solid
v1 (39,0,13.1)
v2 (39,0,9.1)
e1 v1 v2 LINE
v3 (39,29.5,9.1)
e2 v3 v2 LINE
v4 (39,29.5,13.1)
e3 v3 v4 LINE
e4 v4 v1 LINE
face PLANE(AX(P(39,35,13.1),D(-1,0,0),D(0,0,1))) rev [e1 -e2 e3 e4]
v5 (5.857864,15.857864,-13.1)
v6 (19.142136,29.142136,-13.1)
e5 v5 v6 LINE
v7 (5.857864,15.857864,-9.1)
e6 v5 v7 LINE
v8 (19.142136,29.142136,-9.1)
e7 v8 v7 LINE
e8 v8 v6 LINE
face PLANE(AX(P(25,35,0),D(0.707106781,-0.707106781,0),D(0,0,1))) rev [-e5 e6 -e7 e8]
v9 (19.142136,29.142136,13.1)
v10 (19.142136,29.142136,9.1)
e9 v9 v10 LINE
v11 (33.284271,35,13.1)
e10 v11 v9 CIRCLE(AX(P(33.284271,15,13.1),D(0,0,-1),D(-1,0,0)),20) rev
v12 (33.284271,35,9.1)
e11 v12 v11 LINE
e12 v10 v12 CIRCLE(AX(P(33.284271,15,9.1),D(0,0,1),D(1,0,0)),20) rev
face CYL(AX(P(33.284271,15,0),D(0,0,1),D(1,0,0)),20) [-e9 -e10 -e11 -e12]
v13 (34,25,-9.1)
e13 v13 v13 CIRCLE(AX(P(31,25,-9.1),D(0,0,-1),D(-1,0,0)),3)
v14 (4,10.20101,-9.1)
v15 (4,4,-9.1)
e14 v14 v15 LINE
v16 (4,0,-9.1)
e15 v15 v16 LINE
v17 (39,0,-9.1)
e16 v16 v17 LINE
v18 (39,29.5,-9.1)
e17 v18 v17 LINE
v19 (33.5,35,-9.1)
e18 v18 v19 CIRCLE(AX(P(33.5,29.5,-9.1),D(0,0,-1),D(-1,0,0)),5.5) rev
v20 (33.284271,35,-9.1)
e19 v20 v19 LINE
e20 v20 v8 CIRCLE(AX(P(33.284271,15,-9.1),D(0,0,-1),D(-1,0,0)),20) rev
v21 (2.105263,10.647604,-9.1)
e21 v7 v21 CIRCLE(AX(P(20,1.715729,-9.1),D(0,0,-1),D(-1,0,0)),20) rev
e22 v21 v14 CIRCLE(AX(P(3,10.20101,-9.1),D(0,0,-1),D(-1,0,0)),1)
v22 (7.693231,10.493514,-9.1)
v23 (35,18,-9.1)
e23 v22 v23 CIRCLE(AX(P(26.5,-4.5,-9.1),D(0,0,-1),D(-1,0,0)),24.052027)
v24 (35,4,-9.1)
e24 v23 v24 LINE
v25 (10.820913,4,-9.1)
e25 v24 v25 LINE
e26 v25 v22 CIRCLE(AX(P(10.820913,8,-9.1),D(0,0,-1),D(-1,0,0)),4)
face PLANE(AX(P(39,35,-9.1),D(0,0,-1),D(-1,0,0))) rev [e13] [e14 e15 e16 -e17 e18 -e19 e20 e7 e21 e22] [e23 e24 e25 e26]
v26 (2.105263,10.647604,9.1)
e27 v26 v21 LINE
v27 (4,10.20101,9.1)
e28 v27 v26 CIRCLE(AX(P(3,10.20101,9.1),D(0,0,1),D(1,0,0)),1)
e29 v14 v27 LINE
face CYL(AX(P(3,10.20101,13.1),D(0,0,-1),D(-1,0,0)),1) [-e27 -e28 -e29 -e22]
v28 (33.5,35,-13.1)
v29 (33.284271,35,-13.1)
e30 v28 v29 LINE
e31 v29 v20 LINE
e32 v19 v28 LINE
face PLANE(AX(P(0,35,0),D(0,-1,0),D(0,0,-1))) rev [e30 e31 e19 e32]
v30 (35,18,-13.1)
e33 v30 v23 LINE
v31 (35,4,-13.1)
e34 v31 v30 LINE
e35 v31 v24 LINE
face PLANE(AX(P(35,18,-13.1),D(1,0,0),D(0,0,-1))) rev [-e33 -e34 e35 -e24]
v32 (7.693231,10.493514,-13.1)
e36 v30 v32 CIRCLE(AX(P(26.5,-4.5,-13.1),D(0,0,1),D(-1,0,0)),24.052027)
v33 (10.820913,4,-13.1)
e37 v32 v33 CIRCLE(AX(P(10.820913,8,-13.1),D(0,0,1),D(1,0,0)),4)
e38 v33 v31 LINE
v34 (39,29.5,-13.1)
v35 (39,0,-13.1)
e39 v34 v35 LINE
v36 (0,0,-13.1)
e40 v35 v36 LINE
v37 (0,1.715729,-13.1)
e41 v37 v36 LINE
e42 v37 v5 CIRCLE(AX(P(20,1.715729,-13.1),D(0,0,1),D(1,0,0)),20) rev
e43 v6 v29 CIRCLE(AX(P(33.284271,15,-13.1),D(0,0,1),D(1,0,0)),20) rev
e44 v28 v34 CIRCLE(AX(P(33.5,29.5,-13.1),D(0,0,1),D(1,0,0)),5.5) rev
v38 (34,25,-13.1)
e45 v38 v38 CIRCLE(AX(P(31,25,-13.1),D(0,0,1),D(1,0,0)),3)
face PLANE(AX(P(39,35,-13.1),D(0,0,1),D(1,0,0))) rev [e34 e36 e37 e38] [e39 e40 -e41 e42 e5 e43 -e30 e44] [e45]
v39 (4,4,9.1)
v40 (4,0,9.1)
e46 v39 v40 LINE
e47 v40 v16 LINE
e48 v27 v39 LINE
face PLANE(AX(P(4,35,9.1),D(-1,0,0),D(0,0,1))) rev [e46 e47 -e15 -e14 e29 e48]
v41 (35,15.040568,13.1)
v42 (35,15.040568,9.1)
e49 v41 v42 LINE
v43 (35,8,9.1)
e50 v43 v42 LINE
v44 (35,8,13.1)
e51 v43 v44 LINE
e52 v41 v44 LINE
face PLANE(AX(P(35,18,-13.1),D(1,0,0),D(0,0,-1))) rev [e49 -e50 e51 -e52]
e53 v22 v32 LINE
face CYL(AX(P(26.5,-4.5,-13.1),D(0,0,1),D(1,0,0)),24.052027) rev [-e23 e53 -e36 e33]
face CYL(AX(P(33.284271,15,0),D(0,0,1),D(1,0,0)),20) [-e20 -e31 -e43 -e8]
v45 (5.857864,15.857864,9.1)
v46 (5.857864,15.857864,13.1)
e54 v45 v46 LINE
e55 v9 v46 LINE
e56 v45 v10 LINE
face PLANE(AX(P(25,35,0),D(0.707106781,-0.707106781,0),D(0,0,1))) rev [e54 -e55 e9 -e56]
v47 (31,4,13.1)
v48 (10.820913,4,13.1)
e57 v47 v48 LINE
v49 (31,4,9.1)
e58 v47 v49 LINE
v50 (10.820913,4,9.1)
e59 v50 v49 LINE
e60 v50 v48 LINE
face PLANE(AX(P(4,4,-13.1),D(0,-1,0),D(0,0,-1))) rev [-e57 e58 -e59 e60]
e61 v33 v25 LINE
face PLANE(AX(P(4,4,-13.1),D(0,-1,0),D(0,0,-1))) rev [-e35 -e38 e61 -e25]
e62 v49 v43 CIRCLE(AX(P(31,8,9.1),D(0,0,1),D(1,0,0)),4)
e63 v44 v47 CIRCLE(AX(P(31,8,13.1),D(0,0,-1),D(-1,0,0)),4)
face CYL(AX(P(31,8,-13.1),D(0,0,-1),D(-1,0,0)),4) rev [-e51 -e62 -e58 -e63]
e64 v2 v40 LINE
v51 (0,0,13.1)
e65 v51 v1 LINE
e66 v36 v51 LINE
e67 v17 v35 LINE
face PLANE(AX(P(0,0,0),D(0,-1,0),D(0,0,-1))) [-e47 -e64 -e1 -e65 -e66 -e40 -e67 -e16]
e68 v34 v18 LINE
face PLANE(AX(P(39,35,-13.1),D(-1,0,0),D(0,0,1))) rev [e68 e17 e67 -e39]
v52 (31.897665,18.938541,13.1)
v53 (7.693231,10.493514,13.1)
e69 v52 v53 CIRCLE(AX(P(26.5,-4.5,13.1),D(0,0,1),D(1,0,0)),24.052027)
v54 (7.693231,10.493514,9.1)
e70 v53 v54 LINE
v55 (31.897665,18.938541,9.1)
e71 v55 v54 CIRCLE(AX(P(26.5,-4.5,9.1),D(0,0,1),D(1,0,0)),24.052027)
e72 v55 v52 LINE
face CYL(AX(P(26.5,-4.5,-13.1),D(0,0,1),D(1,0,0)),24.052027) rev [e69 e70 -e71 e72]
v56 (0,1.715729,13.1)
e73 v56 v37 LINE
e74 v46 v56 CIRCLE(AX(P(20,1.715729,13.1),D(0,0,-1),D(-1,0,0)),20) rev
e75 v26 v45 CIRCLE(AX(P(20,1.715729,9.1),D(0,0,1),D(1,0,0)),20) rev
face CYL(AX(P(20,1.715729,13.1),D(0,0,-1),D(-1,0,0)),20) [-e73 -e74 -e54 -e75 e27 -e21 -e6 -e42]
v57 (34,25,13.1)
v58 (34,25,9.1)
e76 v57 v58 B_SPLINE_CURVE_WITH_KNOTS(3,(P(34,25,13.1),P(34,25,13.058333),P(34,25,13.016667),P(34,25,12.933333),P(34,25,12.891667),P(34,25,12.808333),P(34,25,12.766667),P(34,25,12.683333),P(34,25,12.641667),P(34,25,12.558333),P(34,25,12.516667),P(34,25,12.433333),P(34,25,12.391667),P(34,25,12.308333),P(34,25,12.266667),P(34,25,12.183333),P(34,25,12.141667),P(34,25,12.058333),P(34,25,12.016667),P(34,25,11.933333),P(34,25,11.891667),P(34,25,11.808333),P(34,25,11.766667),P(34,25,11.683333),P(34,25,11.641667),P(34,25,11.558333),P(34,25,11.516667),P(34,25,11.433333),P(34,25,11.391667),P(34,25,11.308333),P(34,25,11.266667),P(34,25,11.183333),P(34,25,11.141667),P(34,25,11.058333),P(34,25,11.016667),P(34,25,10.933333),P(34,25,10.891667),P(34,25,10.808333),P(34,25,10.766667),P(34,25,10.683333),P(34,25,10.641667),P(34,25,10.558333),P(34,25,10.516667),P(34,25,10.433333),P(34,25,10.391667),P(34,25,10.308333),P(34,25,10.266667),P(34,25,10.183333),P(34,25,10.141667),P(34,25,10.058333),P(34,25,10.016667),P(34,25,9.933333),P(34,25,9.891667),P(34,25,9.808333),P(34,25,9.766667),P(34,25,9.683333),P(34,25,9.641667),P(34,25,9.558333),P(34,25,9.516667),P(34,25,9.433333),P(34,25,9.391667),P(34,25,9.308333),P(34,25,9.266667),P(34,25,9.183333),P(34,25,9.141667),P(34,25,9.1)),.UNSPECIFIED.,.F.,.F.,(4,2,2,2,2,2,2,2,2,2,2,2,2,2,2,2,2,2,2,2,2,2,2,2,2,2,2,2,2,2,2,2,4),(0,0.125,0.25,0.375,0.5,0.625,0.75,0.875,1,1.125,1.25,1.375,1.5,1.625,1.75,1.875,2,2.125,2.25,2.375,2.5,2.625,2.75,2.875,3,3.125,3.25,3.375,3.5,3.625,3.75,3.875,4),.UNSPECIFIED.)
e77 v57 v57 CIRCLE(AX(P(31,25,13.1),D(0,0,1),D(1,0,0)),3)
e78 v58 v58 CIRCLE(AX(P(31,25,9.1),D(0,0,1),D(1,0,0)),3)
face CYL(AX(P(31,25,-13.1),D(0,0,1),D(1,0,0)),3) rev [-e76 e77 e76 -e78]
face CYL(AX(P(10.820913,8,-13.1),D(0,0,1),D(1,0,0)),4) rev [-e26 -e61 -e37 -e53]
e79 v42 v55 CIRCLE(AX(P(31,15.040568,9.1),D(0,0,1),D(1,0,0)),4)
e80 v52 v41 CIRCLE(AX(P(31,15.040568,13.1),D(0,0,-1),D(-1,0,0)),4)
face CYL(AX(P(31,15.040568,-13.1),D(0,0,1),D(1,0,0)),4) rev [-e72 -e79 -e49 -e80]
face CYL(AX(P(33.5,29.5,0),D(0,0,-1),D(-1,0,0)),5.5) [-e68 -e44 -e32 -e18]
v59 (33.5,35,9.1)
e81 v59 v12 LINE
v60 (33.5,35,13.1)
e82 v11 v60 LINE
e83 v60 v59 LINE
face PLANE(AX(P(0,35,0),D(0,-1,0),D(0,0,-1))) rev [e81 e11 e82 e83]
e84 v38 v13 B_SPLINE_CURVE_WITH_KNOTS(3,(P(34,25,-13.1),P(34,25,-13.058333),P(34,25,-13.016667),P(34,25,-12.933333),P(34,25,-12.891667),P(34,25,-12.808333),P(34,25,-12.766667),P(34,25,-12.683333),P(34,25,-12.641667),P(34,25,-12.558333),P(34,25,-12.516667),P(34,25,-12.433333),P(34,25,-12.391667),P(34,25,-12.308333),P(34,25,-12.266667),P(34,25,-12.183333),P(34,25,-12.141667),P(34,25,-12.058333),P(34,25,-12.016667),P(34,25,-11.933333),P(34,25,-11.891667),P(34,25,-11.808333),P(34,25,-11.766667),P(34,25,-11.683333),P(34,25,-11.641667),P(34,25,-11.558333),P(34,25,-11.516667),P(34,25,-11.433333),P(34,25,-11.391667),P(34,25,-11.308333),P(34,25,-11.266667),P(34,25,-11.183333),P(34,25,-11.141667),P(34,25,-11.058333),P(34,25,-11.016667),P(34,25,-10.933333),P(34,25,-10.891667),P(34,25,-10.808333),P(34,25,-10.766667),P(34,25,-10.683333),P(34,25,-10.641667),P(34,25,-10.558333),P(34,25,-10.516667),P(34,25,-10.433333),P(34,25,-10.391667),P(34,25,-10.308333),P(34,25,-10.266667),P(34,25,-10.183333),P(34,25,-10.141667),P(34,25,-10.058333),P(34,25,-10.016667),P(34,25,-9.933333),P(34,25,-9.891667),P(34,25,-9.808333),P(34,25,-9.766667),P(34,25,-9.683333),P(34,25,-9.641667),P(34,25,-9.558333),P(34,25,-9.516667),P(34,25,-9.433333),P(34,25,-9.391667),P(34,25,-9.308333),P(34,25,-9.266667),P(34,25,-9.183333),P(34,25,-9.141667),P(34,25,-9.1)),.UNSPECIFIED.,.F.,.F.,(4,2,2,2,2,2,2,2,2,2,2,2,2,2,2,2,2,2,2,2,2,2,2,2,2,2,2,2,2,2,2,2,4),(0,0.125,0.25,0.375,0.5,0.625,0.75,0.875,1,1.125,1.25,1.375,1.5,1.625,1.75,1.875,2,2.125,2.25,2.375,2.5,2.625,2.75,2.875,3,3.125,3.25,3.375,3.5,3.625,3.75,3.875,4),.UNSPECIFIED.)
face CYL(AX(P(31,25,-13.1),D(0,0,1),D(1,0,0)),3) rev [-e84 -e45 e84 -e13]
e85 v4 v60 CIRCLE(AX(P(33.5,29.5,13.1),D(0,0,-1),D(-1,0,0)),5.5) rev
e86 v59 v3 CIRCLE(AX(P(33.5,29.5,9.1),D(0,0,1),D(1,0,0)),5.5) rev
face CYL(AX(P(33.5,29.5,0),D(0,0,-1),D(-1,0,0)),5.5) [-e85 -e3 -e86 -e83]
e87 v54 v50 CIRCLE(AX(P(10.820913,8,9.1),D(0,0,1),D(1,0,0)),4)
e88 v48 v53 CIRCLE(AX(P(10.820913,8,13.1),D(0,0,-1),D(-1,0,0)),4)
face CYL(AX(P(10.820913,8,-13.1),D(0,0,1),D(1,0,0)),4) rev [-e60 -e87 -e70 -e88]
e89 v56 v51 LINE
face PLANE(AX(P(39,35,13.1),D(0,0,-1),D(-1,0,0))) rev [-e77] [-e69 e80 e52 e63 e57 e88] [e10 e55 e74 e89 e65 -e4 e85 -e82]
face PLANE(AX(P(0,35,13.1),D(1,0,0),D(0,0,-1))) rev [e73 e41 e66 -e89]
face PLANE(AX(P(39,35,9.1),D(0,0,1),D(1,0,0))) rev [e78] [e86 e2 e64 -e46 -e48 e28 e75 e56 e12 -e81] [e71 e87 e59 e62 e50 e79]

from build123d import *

# Parameters (mm, degrees)
BOSS_EXTRUDE1_DEPTH     = 35
CUT_EXTRUDE1_DEPTH      = 55.01490535
CUT_EXTRUDE1_DEPTH_BACK = 55.01490535
SKETCH4_R               = 3
CHAMFER1_SIZE           = 25
FILLET1_R               = 20
FILLET2_R               = 5.5
FILLET3_R               = 1
CUT_EXTRUDE2_DEPTH      = 59.587029281
CUT_EXTRUDE2_DEPTH_BACK = 59.587029281
FILLET4_R               = 4


with BuildPart() as part:
    # Sketch3 → Boss-Extrude1 (new body)
    with BuildSketch(Plane(origin=(0, 0, 0), x_dir=(1, 0, 0), z_dir=(0, 1, 0))):
        Polygon((39, -13.1), (39, -9.1), (4, -9.1), (4, 9.1), (39, 9.1), (39, 13.1), (0, 13.1), (0, -13.1), align=None)
    extrude(amount=BOSS_EXTRUDE1_DEPTH)

    # Sketch4 → Cut-Extrude1 (cut, two sides: drawn at the far end of the back side and taken through both)
    with BuildSketch(Plane.XY.offset(-CUT_EXTRUDE1_DEPTH_BACK)):
        with Locations((31, 25)):
            Circle(SKETCH4_R)
    extrude(amount=CUT_EXTRUDE1_DEPTH + CUT_EXTRUDE1_DEPTH_BACK, mode=Mode.SUBTRACT)

    # Chamfer1
    # the kernel refuses this chamfer: 25 mm, written as the material it takes off along each edge
    with BuildSketch(Plane(origin=(0, 35, -77.392074699), x_dir=(0.9996219169112966, 0.027495876610586317, 0), z_dir=(0, 0, 1))) as chamfer1_piece_1:
        Polygon((CHAMFER1_SIZE * 0.999621916911, -CHAMFER1_SIZE * 0.0274958766106), (-CHAMFER1_SIZE * 0.0274958766106, -CHAMFER1_SIZE * 0.999621916911), (0, 0), align=None)
    extrude(amount=154.784149398, mode=Mode.SUBTRACT)

    # Fillet1
    # the kernel refuses this fillet: 20 mm, written as the material it takes off along each edge
    with BuildSketch(Plane(origin=(0, 10, -33.810678119), x_dir=(0.7071067811862652, 0.7071067811868299, 0), z_dir=(0, 0, 1))) as fillet1_piece_1:
        with BuildLine():
            CenterArc((FILLET1_R * 0.414213562373, -FILLET1_R), FILLET1_R, 90, 45)
            Line((-FILLET1_R * 0.292893218813, -FILLET1_R * 0.292893218813), (0, 0))
            Line((0, 0), (FILLET1_R * 0.414213562373, 0))
        make_face()
    extrude(amount=67.621356237, mode=Mode.SUBTRACT)
    with BuildSketch(Plane(origin=(25, 35, -33.810678119), x_dir=(-0.7071067811862648, -0.7071067811868303, 0), z_dir=(0, 0, 1))) as fillet1_piece_2:
        with BuildLine():
            CenterArc((FILLET1_R * 0.414213562373, FILLET1_R), FILLET1_R, 225, 45)
            Line((-FILLET1_R * 0.292893218814, FILLET1_R * 0.292893218814), (0, 0))
            Line((0, 0), (FILLET1_R * 0.414213562373, 0))
        make_face()
    extrude(amount=45.421356237, mode=Mode.SUBTRACT)
    with BuildSketch(Plane(origin=(25, 35, -11.610678119), x_dir=(1, 0, 0), z_dir=(0, 0, 1))) as fillet1_piece_3:
        with BuildLine():
            CenterArc((FILLET1_R * 0.414213562373, -FILLET1_R), FILLET1_R, 90, 45)
            Line((-FILLET1_R * 0.292893218814, -FILLET1_R * 0.292893218814), (0, 0))
            Line((0, 0), (FILLET1_R * 0.414213562373, 0))
        make_face()
    extrude(amount=45.421356237, mode=Mode.SUBTRACT)

    # Fillet2
    fillet2_edges = [part.edges().sort_by_distance(p)[0] for p in [
        (39, 35, -11.1),
        (39, 35, 11.1),
    ]]
    fillet(fillet2_edges, radius=FILLET2_R)

    # Fillet3
    fillet3_edges = [part.edges().sort_by_distance(p)[0] for p in [
        (4, 13.715728753, 0),
    ]]
    fillet(fillet3_edges, radius=FILLET3_R)

    # Sketch5 → Cut-Extrude2 (cut, two sides: drawn at the far end of the back side and taken through both)
    with BuildSketch(Plane.XY.offset(13.1).offset(-CUT_EXTRUDE2_DEPTH_BACK)):
        with BuildLine():
            Line((4, 4), (35, 4))
            Line((35, 4), (35, 18))
            ThreePointArc((35, 18), (16.600505063, 17.420310217), (4, 4))
        make_face()
    extrude(amount=CUT_EXTRUDE2_DEPTH + CUT_EXTRUDE2_DEPTH_BACK, mode=Mode.SUBTRACT)

    # Fillet4
    fillet4_edges = [part.edges().sort_by_distance(p)[0] for p in [
        (4, 4, 11.1),
        (4, 4, -11.1),
        (35, 18, 11.1),
        (35, 4, 11.1),
    ]]
    fillet(fillet4_edges, radius=FILLET4_R)


solid = part.part
